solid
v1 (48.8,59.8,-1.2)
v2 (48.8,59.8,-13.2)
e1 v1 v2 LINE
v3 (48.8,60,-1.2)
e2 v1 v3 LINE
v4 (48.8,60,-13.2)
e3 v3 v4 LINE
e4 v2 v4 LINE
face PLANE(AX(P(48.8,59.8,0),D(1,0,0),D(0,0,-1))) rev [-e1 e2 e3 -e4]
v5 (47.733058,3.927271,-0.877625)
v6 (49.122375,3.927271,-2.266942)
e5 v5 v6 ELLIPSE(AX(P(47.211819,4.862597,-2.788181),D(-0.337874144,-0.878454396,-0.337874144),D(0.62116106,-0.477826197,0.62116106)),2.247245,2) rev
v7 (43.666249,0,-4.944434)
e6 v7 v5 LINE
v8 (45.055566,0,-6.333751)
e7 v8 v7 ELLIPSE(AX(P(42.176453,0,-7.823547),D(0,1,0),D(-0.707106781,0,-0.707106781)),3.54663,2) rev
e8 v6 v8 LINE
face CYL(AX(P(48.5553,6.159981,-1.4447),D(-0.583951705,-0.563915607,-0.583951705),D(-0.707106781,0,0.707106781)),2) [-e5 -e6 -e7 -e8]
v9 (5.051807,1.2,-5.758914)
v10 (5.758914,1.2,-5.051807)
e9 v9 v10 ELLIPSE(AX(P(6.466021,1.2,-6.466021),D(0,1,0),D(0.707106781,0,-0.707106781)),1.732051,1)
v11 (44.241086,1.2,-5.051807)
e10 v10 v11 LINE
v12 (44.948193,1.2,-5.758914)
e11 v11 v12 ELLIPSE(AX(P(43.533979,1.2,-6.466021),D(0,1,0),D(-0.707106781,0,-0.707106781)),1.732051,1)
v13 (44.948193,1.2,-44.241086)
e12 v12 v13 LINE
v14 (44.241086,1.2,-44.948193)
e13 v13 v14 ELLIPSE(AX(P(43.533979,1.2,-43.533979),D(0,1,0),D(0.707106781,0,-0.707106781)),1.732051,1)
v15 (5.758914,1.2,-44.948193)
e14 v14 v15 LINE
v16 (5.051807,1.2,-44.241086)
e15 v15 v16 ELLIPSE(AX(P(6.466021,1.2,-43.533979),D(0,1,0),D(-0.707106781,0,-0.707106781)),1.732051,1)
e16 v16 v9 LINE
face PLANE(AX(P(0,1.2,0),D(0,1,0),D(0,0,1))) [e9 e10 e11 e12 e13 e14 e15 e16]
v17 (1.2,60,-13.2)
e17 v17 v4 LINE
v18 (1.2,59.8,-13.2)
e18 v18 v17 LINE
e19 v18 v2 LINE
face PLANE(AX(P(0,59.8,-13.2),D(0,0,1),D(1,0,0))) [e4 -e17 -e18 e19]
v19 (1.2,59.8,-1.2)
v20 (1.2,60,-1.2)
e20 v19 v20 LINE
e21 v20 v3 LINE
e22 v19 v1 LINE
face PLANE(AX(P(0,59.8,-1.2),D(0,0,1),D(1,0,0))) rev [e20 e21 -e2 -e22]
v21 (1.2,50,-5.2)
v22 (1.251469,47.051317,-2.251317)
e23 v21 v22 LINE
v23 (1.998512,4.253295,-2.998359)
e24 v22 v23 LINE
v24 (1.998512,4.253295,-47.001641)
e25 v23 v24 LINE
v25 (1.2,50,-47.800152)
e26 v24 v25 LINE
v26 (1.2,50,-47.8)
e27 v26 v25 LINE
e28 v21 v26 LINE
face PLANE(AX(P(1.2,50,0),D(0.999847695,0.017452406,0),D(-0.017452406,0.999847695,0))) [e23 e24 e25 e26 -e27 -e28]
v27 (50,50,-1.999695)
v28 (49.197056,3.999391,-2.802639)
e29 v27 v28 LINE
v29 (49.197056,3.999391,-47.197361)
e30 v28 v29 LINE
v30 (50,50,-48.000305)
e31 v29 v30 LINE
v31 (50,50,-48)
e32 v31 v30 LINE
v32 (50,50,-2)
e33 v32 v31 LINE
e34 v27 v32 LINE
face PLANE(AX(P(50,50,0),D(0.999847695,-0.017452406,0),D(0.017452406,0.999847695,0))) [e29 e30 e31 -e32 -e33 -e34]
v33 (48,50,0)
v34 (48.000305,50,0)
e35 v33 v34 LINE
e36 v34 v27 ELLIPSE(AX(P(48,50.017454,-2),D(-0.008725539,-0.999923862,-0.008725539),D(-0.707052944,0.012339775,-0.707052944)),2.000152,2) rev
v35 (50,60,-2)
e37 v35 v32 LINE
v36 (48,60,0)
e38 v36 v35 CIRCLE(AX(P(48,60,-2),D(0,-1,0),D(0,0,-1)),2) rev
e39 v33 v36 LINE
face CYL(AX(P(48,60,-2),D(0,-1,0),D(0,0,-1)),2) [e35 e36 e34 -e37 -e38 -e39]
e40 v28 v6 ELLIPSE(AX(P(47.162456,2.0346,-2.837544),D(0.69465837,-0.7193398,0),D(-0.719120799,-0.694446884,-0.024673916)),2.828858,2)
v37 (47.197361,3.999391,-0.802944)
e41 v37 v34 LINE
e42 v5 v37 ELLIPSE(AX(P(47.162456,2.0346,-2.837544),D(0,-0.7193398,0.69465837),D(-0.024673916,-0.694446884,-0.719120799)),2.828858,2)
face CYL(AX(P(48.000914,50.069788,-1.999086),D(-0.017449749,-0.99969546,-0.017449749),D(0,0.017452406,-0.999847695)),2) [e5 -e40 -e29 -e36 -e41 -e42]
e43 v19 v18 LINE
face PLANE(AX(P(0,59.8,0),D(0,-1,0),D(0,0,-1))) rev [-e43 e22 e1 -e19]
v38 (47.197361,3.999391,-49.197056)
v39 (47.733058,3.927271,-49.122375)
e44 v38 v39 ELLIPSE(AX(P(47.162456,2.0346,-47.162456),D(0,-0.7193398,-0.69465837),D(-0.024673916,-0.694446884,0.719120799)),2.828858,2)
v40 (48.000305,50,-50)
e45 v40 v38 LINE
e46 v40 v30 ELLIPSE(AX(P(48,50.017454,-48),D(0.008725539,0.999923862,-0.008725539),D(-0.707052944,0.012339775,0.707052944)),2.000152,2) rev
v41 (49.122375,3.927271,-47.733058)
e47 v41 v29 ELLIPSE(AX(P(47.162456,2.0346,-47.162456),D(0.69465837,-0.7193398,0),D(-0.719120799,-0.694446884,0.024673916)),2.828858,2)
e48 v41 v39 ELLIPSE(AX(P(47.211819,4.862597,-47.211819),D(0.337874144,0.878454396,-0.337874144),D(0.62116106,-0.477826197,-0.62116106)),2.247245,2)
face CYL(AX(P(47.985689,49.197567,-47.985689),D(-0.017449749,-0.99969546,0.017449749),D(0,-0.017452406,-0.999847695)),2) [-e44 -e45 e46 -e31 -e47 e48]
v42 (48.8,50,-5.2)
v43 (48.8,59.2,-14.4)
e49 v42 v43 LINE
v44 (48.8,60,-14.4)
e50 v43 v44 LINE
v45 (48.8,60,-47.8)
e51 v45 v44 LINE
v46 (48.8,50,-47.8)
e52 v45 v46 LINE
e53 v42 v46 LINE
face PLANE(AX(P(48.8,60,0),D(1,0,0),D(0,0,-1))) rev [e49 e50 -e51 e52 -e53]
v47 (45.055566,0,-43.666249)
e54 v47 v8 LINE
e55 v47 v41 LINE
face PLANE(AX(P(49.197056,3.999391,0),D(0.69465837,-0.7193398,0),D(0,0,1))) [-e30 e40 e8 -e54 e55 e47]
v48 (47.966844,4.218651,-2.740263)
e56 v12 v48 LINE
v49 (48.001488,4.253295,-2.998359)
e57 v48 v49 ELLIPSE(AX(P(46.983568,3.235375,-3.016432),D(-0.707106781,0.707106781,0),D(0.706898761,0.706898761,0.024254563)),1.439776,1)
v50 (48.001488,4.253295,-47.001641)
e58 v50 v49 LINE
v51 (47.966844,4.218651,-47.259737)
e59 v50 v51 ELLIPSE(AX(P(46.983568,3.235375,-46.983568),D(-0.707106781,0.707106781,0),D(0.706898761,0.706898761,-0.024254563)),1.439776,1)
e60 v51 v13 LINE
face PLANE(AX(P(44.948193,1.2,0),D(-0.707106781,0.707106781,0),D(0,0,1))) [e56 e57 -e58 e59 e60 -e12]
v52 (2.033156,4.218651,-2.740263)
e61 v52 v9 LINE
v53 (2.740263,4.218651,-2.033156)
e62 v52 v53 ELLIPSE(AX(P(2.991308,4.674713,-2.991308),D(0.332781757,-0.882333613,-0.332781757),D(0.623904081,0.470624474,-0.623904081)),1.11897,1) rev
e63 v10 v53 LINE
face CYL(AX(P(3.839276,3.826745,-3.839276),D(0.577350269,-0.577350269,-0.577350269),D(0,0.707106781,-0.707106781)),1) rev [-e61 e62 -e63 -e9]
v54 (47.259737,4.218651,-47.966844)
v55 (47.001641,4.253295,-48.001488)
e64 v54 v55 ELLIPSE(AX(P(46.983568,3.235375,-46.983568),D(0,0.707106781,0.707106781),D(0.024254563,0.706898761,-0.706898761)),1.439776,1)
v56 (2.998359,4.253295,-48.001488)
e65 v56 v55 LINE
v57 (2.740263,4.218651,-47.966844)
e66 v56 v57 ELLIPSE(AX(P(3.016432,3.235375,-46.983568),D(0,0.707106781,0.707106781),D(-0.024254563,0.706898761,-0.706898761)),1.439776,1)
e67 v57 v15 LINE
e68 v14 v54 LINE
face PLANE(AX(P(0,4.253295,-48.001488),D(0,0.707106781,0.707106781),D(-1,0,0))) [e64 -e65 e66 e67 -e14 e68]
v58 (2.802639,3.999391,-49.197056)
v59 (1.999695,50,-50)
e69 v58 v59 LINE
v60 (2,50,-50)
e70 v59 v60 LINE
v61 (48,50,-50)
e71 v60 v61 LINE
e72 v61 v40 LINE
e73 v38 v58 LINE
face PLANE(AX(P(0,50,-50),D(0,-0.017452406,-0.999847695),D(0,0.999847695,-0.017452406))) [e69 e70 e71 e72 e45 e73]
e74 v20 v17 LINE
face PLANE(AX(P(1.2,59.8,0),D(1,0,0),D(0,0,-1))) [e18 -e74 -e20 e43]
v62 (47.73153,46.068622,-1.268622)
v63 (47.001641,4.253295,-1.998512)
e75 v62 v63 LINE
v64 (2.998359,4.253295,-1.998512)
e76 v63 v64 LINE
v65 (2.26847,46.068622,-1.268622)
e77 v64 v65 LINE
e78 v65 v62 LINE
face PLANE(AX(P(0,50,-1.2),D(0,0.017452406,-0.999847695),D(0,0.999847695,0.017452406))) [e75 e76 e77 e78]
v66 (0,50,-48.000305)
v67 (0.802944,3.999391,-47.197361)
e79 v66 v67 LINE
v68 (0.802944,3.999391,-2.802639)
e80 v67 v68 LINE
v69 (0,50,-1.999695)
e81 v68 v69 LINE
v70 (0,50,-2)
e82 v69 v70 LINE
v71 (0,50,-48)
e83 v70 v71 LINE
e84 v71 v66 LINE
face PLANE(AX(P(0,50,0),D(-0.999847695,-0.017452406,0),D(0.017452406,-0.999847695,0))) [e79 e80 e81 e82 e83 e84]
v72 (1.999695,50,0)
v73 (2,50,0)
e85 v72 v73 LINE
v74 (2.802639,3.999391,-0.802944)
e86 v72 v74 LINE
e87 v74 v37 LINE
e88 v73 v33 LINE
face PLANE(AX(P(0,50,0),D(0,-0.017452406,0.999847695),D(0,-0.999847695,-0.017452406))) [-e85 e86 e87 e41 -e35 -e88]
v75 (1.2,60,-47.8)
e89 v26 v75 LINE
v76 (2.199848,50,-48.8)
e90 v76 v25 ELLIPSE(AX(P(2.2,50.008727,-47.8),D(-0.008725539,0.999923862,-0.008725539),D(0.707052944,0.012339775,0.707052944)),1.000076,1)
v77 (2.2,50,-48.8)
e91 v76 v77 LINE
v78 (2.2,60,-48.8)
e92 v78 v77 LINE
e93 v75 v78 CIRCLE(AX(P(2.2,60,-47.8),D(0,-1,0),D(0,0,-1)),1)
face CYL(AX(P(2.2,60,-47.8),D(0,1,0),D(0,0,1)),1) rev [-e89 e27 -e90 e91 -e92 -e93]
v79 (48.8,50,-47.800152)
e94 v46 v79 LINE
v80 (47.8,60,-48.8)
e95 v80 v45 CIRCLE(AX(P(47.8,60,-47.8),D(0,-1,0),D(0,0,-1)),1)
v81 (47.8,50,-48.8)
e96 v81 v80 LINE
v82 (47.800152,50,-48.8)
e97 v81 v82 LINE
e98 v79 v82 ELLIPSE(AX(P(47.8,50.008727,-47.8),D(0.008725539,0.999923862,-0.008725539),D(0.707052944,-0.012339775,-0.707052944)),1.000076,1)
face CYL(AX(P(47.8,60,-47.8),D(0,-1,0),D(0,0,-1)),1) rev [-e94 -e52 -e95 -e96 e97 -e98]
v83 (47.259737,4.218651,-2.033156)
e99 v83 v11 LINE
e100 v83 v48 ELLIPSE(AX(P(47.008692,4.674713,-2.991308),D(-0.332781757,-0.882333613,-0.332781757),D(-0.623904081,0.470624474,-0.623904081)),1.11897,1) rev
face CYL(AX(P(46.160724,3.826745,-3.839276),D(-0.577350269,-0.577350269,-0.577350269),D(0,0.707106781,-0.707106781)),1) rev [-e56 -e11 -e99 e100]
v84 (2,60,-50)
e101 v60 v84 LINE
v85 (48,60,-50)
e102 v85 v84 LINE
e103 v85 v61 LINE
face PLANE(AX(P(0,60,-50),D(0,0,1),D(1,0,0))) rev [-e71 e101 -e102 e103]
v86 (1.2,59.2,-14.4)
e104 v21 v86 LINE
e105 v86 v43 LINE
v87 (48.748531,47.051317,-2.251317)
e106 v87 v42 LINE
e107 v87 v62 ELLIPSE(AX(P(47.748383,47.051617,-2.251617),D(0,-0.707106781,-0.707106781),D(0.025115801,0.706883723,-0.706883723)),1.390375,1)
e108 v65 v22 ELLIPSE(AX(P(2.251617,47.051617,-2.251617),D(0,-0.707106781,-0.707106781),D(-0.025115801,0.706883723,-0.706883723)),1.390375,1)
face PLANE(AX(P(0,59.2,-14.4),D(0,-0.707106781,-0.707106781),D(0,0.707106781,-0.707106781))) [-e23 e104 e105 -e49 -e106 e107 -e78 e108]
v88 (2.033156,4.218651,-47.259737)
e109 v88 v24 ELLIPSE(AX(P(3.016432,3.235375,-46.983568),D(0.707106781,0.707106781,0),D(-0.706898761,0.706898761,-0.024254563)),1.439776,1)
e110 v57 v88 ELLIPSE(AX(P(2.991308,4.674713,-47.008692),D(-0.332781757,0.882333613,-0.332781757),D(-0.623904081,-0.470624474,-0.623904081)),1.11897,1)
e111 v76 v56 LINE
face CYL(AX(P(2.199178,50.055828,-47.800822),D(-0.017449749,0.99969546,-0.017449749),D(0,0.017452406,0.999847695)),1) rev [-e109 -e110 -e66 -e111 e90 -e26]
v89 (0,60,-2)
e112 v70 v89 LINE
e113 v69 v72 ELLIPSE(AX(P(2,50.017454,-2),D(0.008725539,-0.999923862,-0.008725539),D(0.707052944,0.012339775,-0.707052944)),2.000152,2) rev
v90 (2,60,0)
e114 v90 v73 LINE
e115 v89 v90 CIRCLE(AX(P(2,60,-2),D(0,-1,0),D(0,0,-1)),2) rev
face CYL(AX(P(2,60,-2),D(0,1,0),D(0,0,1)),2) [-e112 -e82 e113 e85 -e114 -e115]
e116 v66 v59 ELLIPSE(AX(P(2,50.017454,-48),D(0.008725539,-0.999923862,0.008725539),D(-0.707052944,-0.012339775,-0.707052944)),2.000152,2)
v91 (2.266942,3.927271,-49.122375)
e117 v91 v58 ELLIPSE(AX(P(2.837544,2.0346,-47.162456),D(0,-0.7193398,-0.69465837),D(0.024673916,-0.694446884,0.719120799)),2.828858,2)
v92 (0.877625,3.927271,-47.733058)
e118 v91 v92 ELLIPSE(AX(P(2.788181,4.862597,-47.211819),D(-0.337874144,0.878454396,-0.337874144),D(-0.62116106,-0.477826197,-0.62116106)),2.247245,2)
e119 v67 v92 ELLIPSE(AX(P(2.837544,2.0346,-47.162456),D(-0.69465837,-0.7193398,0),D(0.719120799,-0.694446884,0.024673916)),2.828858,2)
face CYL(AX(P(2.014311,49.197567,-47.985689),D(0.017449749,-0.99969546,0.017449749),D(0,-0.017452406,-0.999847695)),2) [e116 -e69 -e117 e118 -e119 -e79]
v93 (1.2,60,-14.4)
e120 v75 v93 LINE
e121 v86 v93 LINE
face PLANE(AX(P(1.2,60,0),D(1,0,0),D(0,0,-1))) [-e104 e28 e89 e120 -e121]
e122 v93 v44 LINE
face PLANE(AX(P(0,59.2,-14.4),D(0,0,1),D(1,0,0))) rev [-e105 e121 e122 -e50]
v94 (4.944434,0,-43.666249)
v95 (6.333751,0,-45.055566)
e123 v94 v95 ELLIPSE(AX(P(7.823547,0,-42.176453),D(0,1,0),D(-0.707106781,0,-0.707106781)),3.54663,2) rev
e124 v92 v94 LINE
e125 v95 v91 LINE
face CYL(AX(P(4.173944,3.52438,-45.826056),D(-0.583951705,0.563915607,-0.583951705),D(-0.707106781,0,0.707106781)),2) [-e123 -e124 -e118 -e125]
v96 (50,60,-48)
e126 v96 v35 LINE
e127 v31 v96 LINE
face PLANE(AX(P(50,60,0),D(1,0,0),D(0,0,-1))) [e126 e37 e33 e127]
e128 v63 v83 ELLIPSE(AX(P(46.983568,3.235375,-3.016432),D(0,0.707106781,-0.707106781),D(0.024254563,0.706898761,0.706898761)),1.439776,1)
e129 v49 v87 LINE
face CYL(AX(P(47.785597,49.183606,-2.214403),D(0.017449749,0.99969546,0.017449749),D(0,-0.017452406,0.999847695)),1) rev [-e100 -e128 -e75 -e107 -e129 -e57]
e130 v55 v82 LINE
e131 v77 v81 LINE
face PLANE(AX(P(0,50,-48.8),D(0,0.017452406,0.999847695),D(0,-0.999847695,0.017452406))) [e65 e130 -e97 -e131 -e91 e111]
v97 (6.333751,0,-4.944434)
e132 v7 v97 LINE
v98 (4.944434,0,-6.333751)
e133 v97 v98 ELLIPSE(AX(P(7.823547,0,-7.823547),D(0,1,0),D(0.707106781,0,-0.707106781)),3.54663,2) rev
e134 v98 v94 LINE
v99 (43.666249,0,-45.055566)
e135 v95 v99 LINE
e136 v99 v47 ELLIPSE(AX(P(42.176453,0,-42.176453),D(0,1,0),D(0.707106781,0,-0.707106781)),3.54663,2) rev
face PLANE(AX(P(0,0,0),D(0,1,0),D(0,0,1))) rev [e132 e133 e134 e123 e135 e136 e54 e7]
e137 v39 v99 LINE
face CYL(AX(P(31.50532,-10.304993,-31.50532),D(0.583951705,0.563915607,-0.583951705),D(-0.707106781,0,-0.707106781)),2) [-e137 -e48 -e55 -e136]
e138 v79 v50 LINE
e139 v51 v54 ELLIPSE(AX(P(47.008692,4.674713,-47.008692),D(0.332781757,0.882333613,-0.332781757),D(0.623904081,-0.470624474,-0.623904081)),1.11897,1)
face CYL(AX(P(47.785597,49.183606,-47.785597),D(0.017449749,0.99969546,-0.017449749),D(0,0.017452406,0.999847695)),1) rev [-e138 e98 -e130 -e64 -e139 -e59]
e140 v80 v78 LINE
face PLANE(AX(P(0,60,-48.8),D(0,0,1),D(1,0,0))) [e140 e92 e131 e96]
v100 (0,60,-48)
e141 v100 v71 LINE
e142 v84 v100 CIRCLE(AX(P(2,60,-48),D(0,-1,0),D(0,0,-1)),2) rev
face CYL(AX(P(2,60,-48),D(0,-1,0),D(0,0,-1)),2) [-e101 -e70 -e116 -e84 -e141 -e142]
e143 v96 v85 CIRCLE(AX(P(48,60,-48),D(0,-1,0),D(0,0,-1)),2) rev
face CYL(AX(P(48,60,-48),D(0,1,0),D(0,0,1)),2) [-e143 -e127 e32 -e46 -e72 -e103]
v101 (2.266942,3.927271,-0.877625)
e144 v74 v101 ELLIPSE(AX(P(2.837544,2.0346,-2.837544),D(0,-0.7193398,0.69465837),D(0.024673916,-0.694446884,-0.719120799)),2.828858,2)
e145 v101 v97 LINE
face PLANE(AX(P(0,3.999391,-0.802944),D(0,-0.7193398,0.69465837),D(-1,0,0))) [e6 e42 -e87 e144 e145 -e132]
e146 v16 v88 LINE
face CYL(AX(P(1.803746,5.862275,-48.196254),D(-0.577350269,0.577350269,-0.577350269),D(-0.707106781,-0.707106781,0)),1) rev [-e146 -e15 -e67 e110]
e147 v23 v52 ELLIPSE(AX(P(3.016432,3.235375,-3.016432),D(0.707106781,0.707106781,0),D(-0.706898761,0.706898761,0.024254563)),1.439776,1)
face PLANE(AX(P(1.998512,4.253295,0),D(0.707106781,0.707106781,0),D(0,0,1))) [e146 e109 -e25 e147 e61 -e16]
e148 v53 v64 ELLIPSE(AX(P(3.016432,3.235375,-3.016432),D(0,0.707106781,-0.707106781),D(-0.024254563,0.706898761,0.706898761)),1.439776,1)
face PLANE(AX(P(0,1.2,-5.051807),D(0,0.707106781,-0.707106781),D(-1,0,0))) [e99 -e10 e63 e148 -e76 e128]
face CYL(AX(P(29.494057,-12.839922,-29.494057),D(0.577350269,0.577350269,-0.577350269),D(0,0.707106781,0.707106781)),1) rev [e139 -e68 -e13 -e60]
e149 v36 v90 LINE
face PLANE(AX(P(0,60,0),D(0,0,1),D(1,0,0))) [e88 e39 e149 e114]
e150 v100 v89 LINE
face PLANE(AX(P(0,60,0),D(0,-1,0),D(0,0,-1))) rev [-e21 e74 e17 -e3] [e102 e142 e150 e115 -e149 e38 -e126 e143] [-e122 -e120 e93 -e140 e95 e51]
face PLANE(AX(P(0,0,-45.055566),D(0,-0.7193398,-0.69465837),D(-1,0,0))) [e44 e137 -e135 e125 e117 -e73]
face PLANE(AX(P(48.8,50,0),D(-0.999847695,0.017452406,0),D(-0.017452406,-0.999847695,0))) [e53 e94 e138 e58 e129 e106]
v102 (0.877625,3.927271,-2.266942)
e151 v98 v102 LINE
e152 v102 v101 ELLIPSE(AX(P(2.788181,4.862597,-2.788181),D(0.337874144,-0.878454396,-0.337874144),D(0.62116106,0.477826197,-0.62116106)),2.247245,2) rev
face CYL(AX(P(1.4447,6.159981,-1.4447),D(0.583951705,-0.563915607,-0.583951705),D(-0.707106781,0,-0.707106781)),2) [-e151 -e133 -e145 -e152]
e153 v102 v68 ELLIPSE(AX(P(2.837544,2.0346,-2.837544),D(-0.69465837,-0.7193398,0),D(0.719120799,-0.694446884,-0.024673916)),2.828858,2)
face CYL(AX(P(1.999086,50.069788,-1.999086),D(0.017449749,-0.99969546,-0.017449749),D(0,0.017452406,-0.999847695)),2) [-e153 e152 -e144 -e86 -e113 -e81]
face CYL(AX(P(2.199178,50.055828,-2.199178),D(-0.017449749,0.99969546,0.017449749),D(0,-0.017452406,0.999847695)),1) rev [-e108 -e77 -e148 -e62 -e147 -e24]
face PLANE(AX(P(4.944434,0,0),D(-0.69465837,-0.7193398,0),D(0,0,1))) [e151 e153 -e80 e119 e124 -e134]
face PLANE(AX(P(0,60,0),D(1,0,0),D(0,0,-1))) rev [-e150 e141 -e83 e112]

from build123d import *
from OCP.BRepFilletAPI import BRepFilletAPI_MakeChamfer

# Parameters (mm, degrees)
SKETCH1_W             = 50
SKETCH1_H             = 50
SKETCH1_W_2           = 47.6
SKETCH1_H_2           = 47.6
BOSS_EXTRUDE1_DEPTH   = 50
SKETCH1_3_W           = 42
SKETCH1_3_H           = 9.2
SKETCH1_3_H_2         = 1.2
SKETCH1_3_H_3         = 31.6
SKETCH1_3_W_2         = 2.8
BOSS_EXTRUDE2_DEPTH   = 1.2
DRAFT1_ANGLE          = -1
DRAFT2_ANGLE          = 1
BOSS_EXTRUDE3_START   = 50
SKETCH1_4_W           = 50
SKETCH1_4_H           = 50
SKETCH1_4_W_2         = 47.6
SKETCH1_4_H_2         = 47.6
BOSS_EXTRUDE3_DEPTH   = 10
BOSS_EXTRUDE4_START   = 60
SKETCH1_5_W           = 42
SKETCH1_5_H           = 9.2
SKETCH1_5_H_2         = 1.2
SKETCH1_5_W_2         = 2.8
BOSS_EXTRUDE4_DEPTH   = 0.8
DRAFT3_START          = 1.2
DRAFT3_DEPTH          = 47.6
CHAMFER2_SIZE         = 3
CHAMFER2_SIZE2        = 3.053760573
CHAMFER2_EDGE_2_SIZE  = 3
CHAMFER2_EDGE_2_SIZE2 = 3.053760573
CHAMFER2_EDGE_3_SIZE  = 3
CHAMFER2_EDGE_3_SIZE2 = 3.053760573
CHAMFER2_EDGE_4_SIZE  = 3
CHAMFER2_EDGE_4_SIZE2 = 3.053760573
CHAMFER4_SIZE         = 4
CHAMFER4_SIZE2        = 4.071680764
FILLET1_R             = 2
FILLET2_R             = 1
CUT_EXTRUDE3_START    = 60
SKETCH1_10_W          = 42
SKETCH1_10_H          = 9.2
CUT_EXTRUDE3_DEPTH    = 0.2


with BuildPart() as part:
    # Sketch1 → Boss-Extrude1 (new body)
    with BuildSketch(Plane(origin=(0, 0, 0), x_dir=(1, 0, 0), z_dir=(0, 1, 0))):
        with Locations((25, 25)):
            Rectangle(SKETCH1_W, SKETCH1_H)
        with Locations((25, 25)):
            Rectangle(SKETCH1_W_2, SKETCH1_H_2, mode=Mode.SUBTRACT)
    extrude(amount=BOSS_EXTRUDE1_DEPTH)

    # Sketch1<3> → Boss-Extrude2 (add)
    with BuildSketch(Plane(origin=(0, 0, 0), x_dir=(1, 0, 0), z_dir=(0, 1, 0))):
        with Locations((25, 8.6)):
            Rectangle(SKETCH1_3_W, SKETCH1_3_H)
        with Locations((25, 13.8)):
            Rectangle(SKETCH1_3_W, SKETCH1_3_H_2)
        with Locations((25, 30.2)):
            Rectangle(SKETCH1_3_W, SKETCH1_3_H_3)
        Polygon((4, 14.4), (4, 46), (46, 46), (46, 14.4), (48.8, 14.4), (48.8, 48.8), (1.2, 48.8), (1.2, 14.4), align=None)
        Polygon((4, 4), (4, 13.2), (1.2, 13.2), (1.2, 1.2), (48.8, 1.2), (48.8, 13.2), (46, 13.2), (46, 4), align=None)
        with Locations((2.6, 13.8)):
            Rectangle(SKETCH1_3_W_2, SKETCH1_3_H_2)
        with Locations((47.4, 13.8)):
            Rectangle(SKETCH1_3_W_2, SKETCH1_3_H_2)
    extrude(amount=BOSS_EXTRUDE2_DEPTH)

    # Draft1
    draft1_faces = [part.faces().sort_by_distance(p)[0] for p in [
        (0, 25, -25),
        (25, 25, -50),
        (50, 25, -25),
        (25, 25, 0),
    ]]
    draft(draft1_faces, Plane.ZX.offset(50), DRAFT1_ANGLE)

    # Draft2
    draft2_faces = [part.faces().sort_by_distance(p)[0] for p in [
        (25, 25.6, -48.8),
        (1.2, 25.6, -25),
        (48.8, 25.6, -25),
        (25, 25.6, -1.2),
    ]]
    draft(draft2_faces, Plane.ZX.offset(50), DRAFT2_ANGLE)

    # Sketch1<4> → Boss-Extrude3 (add)
    with BuildSketch(Plane(origin=(0, 0, 0), x_dir=(1, 0, 0), z_dir=(0, 1, 0)).offset(BOSS_EXTRUDE3_START)):
        with Locations((25, 25)):
            Rectangle(SKETCH1_4_W, SKETCH1_4_H)
        with Locations((25, 25)):
            Rectangle(SKETCH1_4_W_2, SKETCH1_4_H_2, mode=Mode.SUBTRACT)
    extrude(amount=BOSS_EXTRUDE3_DEPTH)

    # Sketch1<5> → Boss-Extrude4 (add)
    with BuildSketch(Plane(origin=(0, 0, 0), x_dir=(1, 0, 0), z_dir=(0, 1, 0)).offset(BOSS_EXTRUDE4_START)):
        with Locations((25, 8.6)):
            Rectangle(SKETCH1_5_W, SKETCH1_5_H)
        with Locations((25, 13.8)):
            Rectangle(SKETCH1_5_W, SKETCH1_5_H_2)
        Polygon((4, 4), (4, 13.2), (1.2, 13.2), (1.2, 1.2), (48.8, 1.2), (48.8, 13.2), (46, 13.2), (46, 4), align=None)
        with Locations((47.4, 13.8)):
            Rectangle(SKETCH1_5_W_2, SKETCH1_5_H_2)
        with Locations((2.6, 13.8)):
            Rectangle(SKETCH1_5_W_2, SKETCH1_5_H_2)
    extrude(amount=-BOSS_EXTRUDE4_DEPTH)

    # Draft3: read off the stored shape, not the designer's step
    # Draft3 outline → Draft3 (add)
    with BuildSketch(Plane.YZ.offset(DRAFT3_START)):
        Polygon((50, -1.2), (46.06862245, -1.26862245), (59.2, -14.4), (59.2, -1.2), align=None)
    extrude(amount=DRAFT3_DEPTH)

    # Chamfer2
    chamfer2_edges = [part.edges().sort_by_distance(p)[0] for p in [
        (25, 1.2, -47.948192832),
    ]]
    chamfer2_side = [part.faces().sort_by_distance(p)[0] for p in [
        (25, 1.2, -25),
    ]]
    chamfer(chamfer2_edges, length=CHAMFER2_SIZE, length2=CHAMFER2_SIZE2, reference=chamfer2_side[0])

    # Chamfer2 edge 2
    chamfer2_edge_2_edges = [part.edges().sort_by_distance(p)[0] for p in [
        (2.051807168, 1.2, -25),
    ]]
    chamfer2_edge_2_side = [part.faces().sort_by_distance(p)[0] for p in [
        (25, 1.2, -25),
    ]]
    chamfer(chamfer2_edge_2_edges, length=CHAMFER2_EDGE_2_SIZE, length2=CHAMFER2_EDGE_2_SIZE2, reference=chamfer2_edge_2_side[0])

    # Chamfer2 edge 3
    chamfer2_edge_3_edges = [part.edges().sort_by_distance(p)[0] for p in [
        (25, 1.2, -2.051807168),
    ]]
    chamfer2_edge_3_side = [part.faces().sort_by_distance(p)[0] for p in [
        (25, 1.2, -25),
    ]]
    chamfer(chamfer2_edge_3_edges, length=CHAMFER2_EDGE_3_SIZE, length2=CHAMFER2_EDGE_3_SIZE2, reference=chamfer2_edge_3_side[0])

    # Chamfer2 edge 4
    chamfer2_edge_4_edges = [part.edges().sort_by_distance(p)[0] for p in [
        (47.948192832, 1.2, -25),
    ]]
    chamfer2_edge_4_side = [part.faces().sort_by_distance(p)[0] for p in [
        (25, 1.2, -25),
    ]]
    chamfer(chamfer2_edge_4_edges, length=CHAMFER2_EDGE_4_SIZE, length2=CHAMFER2_EDGE_4_SIZE2, reference=chamfer2_edge_4_side[0])

    # Chamfer4: one chamfer whose edges measure the first distance from different faces: ONE call of the kernel's chamfer builder (chamfer() names one face for all edges)
    chamfer4_edges_1 = [part.edges().sort_by_distance(p)[0] for p in [
        (0.872753246, 0, -25),
    ]]
    chamfer4_side_1 = [part.faces().sort_by_distance(p)[0] for p in [
        (0.433792523, 25.148042974, -25),
    ]]
    chamfer4_edges_2 = [part.edges().sort_by_distance(p)[0] for p in [
        (25, 0, -49.127246754),
    ]]
    chamfer4_side_2 = [part.faces().sort_by_distance(p)[0] for p in [
        (25, 25.148042974, -49.566207477),
    ]]
    chamfer4_edges_3 = [part.edges().sort_by_distance(p)[0] for p in [
        (49.127246754, 0, -25),
    ]]
    chamfer4_side_3 = [part.faces().sort_by_distance(p)[0] for p in [
        (49.566207477, 25.148042974, -25),
    ]]
    chamfer4_edges_4 = [part.edges().sort_by_distance(p)[0] for p in [
        (25, 0, -0.872753246),
    ]]
    chamfer4_side_4 = [part.faces().sort_by_distance(p)[0] for p in [
        (25, 25.148042974, -0.433792523),
    ]]
    chamfer4 = BRepFilletAPI_MakeChamfer(part.part.solid().wrapped)
    for e in chamfer4_edges_1:
        chamfer4.Add(CHAMFER4_SIZE, CHAMFER4_SIZE2, e.wrapped, chamfer4_side_1[0].wrapped)  # the first distance lies on this face
    for e in chamfer4_edges_2:
        chamfer4.Add(CHAMFER4_SIZE, CHAMFER4_SIZE2, e.wrapped, chamfer4_side_2[0].wrapped)  # the first distance lies on this face
    for e in chamfer4_edges_3:
        chamfer4.Add(CHAMFER4_SIZE, CHAMFER4_SIZE2, e.wrapped, chamfer4_side_3[0].wrapped)  # the first distance lies on this face
    for e in chamfer4_edges_4:
        chamfer4.Add(CHAMFER4_SIZE, CHAMFER4_SIZE2, e.wrapped, chamfer4_side_4[0].wrapped)  # the first distance lies on this face
    add(Compound.cast(chamfer4.Shape()), mode=Mode.REPLACE)

    # Fillet1
    # the kernel refuses this fillet: 2 mm, written as the material it takes off along each edge
    with BuildSketch(Plane(origin=(-0.843553781, 5.589394839, 0.843553781), x_dir=(0.8117883996686079, 0.40564694005466123, 0.4200597031229852), z_dir=(0.5839517053348507, -0.5639156068713114, -0.5839517053348507)), Plane(origin=(-0.843553781, 5.589394839, -50.843553781), x_dir=(-0.4200597031229874, 0.40564694005465957, 0.8117883996686076), z_dir=(0.5839517053348504, -0.5639156068713111, 0.5839517053348512))) as fillet1_piece_1:
        with BuildLine():
            CenterArc((FILLET1_R * 0.563915606871, -FILLET1_R), FILLET1_R, 90, 58.838659397)
            Line((-FILLET1_R * 0.291797988867, -FILLET1_R * 0.482550251649), (0, 0))
            Line((0, 0), (FILLET1_R * 0.563915606871, 0))
        make_face()
    extrude(amount=12.7313357, mode=Mode.SUBTRACT)
    with BuildSketch(Plane(origin=(50.843553781, 5.589394839, 0.843553781), x_dir=(-0.8117883996686076, 0.4056469400546599, 0.420059703122987), z_dir=(-0.5839517053348513, -0.5639156068713113, -0.5839517053348505)), Plane(origin=(50.843553781, 5.589394839, -50.843553781), x_dir=(0.420059703122986, 0.4056469400546607, 0.8117883996686078), z_dir=(-0.583951705334851, -0.5639156068713108, 0.583951705334851))) as fillet1_piece_2:
        with BuildLine():
            CenterArc((FILLET1_R * 0.563915606871, FILLET1_R), FILLET1_R, 211.161340603, 58.838659397)
            Line((-FILLET1_R * 0.291797988867, FILLET1_R * 0.482550251649), (0, 0))
            Line((0, 0), (FILLET1_R * 0.563915606871, 0))
        make_face()
    extrude(amount=12.7313357, mode=Mode.SUBTRACT)
    with BuildSketch(Plane(origin=(0.890165796, -0.997564282, -0.890165796), x_dir=(0.9998477415357947, 0.017447091479365802, 0.0003045401145796421), z_dir=(-0.017449749160682707, 0.9996954598818875, 0.017449749160682707)), Plane(origin=(0.890165796, -0.997564282, -49.109834204), x_dir=(-0.0003045401145796421, 0.017447091479365802, 0.9998477415357947), z_dir=(-0.017449749160682707, 0.9996954598818875, -0.017449749160682707))) as fillet1_piece_3:
        with BuildLine():
            CenterArc((FILLET1_R * 0.999695459882, FILLET1_R), FILLET1_R, 180.017451521, 89.982548479)
            Line((-FILLET1_R * 0.000304493731645, FILLET1_R * 0.99969541351), (0, 0))
            Line((0, 0), (FILLET1_R * 0.999695459882, 0))
        make_face()
    extrude(amount=56.011577117, mode=Mode.SUBTRACT)
    with BuildSketch(Plane(origin=(49.109834204, -0.997564282, -49.109834204), x_dir=(0.0003045401145816405, 0.017447091479365767, 0.9998477415357947), z_dir=(0.017449749160682707, 0.9996954598818875, -0.017449749160682707)), Plane(origin=(49.109834204, -0.997564282, -0.890165796), x_dir=(-0.9998477415357947, 0.01744709147936578, 0.00030454011458086336), z_dir=(0.017449749160682707, 0.9996954598818875, 0.017449749160682707))) as fillet1_piece_4:
        with BuildLine():
            CenterArc((FILLET1_R * 0.999695459882, -FILLET1_R), FILLET1_R, 90, 89.982548479)
            Line((-FILLET1_R * 0.000304493731644, -FILLET1_R * 0.99969541351), (0, 0))
            Line((0, 0), (FILLET1_R * 0.999695459882, 0))
        make_face()
    extrude(amount=56.011577117, mode=Mode.SUBTRACT)
    with BuildSketch(Plane(origin=(0, 45, -50), x_dir=(0, 0, 1), z_dir=(0, 1, 0)), Plane(origin=(0, 45, 0), x_dir=(1, 0, 0), z_dir=(0, 1, 0))) as fillet1_piece_5:
        with BuildLine():
            CenterArc((FILLET1_R, FILLET1_R), FILLET1_R, 180, 90)
            Line((0, FILLET1_R), (0, 0))
            Line((0, 0), (FILLET1_R, 0))
        make_face()
    extrude(amount=20, mode=Mode.SUBTRACT)
    with BuildSketch(Plane(origin=(50, 45, 0), x_dir=(-1, 0, 0), z_dir=(0, 1, 0)), Plane(origin=(50, 45, -50), x_dir=(0, 0, 1), z_dir=(0, 1, 0))) as fillet1_piece_6:
        with BuildLine():
            CenterArc((FILLET1_R, -FILLET1_R), FILLET1_R, 90, 90)
            Line((0, -FILLET1_R), (0, 0))
            Line((0, 0), (FILLET1_R, 0))
        make_face()
    extrude(amount=20, mode=Mode.SUBTRACT)

    # Fillet2
    # the kernel refuses this fillet: 1 mm, written as the material it adds along each edge
    with BuildSketch(Plane(origin=(5.885140502, 0.366666667, -5.885140502), x_dir=(-0.40824829046386174, 0.4082482904638633, -0.8164965809277265), z_dir=(-0.5773502691896252, 0.5773502691896272, 0.5773502691896252))) as fillet2_piece_1_section:
        with BuildLine():
            CenterArc((FILLET2_R * 0.57735026919, -FILLET2_R), FILLET2_R, 90, 60)
            Line((-FILLET2_R * 0.288675134595, -FILLET2_R * 0.5), (0, 0))
            Line((0, 0), (FILLET2_R * 0.57735026919, 0))
        make_face()
    fillet2_piece_1 = extrude(amount=8.175214232, mode=Mode.PRIVATE)
    fillet2_piece_1 = split(fillet2_piece_1, bisect_by=Plane(origin=(5.885140502, 0.300029787, -2.067516207), z_dir=(0, 0.017452406437283536, -0.9998476951563913)), keep=Keep.TOP, mode=Mode.PRIVATE)
    add(fillet2_piece_1)
    with BuildSketch(Plane(origin=(5.885140502, 0.366666667, -44.114859498), x_dir=(-0.4082482904638601, 0.4082482904638647, 0.8164965809277266), z_dir=(-0.5773502691896252, 0.5773502691896274, -0.577350269189625))) as fillet2_piece_2_section:
        with BuildLine():
            CenterArc((FILLET2_R * 0.57735026919, FILLET2_R), FILLET2_R, 210, 60)
            Line((-FILLET2_R * 0.288675134595, FILLET2_R * 0.5), (0, 0))
            Line((0, 0), (FILLET2_R * 0.57735026919, 0))
        make_face()
    fillet2_piece_2 = extrude(amount=8.175214232, mode=Mode.PRIVATE)
    fillet2_piece_2 = split(fillet2_piece_2, bisect_by=Plane(origin=(5.885140502, 0.300029787, -47.932483793), z_dir=(0, 0.017452406437283536, 0.9998476951563913)), keep=Keep.TOP, mode=Mode.PRIVATE)
    add(fillet2_piece_2)
    with BuildSketch(Plane(origin=(44.114859498, 0.366666667, -5.885140502), x_dir=(0.4082482904638648, 0.40824829046386013, -0.8164965809277265), z_dir=(0.577350269189625, 0.5773502691896274, 0.5773502691896252))) as fillet2_piece_3_section:
        with BuildLine():
            CenterArc((FILLET2_R * 0.57735026919, FILLET2_R), FILLET2_R, 210, 60)
            Line((-FILLET2_R * 0.288675134595, FILLET2_R * 0.5), (0, 0))
            Line((0, 0), (FILLET2_R * 0.57735026919, 0))
        make_face()
    fillet2_piece_3 = extrude(amount=8.175214232, mode=Mode.PRIVATE)
    fillet2_piece_3 = split(fillet2_piece_3, bisect_by=Plane(origin=(44.114859498, 0.300029787, -2.067516207), z_dir=(0, 0.017452406437283536, -0.9998476951563913)), keep=Keep.TOP, mode=Mode.PRIVATE)
    add(fillet2_piece_3)
    with BuildSketch(Plane(origin=(44.114859498, 0.366666667, -44.114859498), x_dir=(-0.8164965809277265, 0.4082482904638685, -0.40824829046385624), z_dir=(0.5773502691896251, 0.5773502691896274, -0.5773502691896251))) as fillet2_piece_4_section:
        with BuildLine():
            CenterArc((FILLET2_R * 0.57735026919, FILLET2_R), FILLET2_R, 210, 60)
            Line((-FILLET2_R * 0.288675134595, FILLET2_R * 0.5), (0, 0))
            Line((0, 0), (FILLET2_R * 0.57735026919, 0))
        make_face()
    fillet2_piece_4 = extrude(amount=8.175214232, mode=Mode.PRIVATE)
    fillet2_piece_4 = split(fillet2_piece_4, bisect_by=Plane(origin=(47.932483793, 0.300029787, -44.114859498), z_dir=(-0.9998476951563913, 0.017452406437283536, 0)), keep=Keep.TOP, mode=Mode.PRIVATE)
    add(fillet2_piece_4)
    with BuildSketch(Plane(origin=(47.957877215, 1.754817939, -47.957877215), x_dir=(-0.9998477415357947, 0.017447091479365767, -0.0003045401145816405), z_dir=(0.017449749160682707, 0.9996954598818875, -0.017449749160682707))) as fillet2_piece_5_section:
        with BuildLine():
            CenterArc((FILLET2_R * 0.999695459882, FILLET2_R), FILLET2_R, 180.017451521, 89.982548479)
            Line((-FILLET2_R * 0.000304493731648, FILLET2_R * 0.99969541351), (0, 0))
            Line((0, 0), (FILLET2_R * 0.999695459882, 0))
        make_face()
    fillet2_piece_5 = extrude(amount=50.75911778, mode=Mode.PRIVATE)
    fillet2_piece_5 = split(fillet2_piece_5, bisect_by=Plane(origin=(46.730443993, 2.982251161, -47.957877215), z_dir=(-0.707106781186549, 0.7071067811865461, 0)), keep=Keep.TOP, mode=Mode.PRIVATE)
    add(fillet2_piece_5)
    with BuildSketch(Plane(origin=(2.042122785, 1.754817939, -47.957877215), x_dir=(-0.00030454011457675554, 0.01744709147936585, 0.9998477415357947), z_dir=(-0.017449749160682707, 0.9996954598818875, -0.017449749160682707))) as fillet2_piece_6_section:
        with BuildLine():
            CenterArc((FILLET2_R * 0.999695459882, FILLET2_R), FILLET2_R, 180.017451521, 89.982548479)
            Line((-FILLET2_R * 0.000304493731643, FILLET2_R * 0.99969541351), (0, 0))
            Line((0, 0), (FILLET2_R * 0.999695459882, 0))
        make_face()
    fillet2_piece_6 = extrude(amount=50.75911778, mode=Mode.PRIVATE)
    fillet2_piece_6 = split(fillet2_piece_6, bisect_by=Plane(origin=(2.042122785, 2.982251161, -46.730443993), z_dir=(0, 0.7071067811865461, 0.707106781186549)), keep=Keep.TOP, mode=Mode.PRIVATE)
    add(fillet2_piece_6)
    with BuildSketch(Plane(origin=(1.2, 47.5, -48.8), x_dir=(0, 0, 1), z_dir=(0, 1, 0)), Plane(origin=(48.8, 47.5, -48.8), x_dir=(-1, 0, 0), z_dir=(0, 1, 0))) as fillet2_piece_7:
        with BuildLine():
            CenterArc((FILLET2_R, FILLET2_R), FILLET2_R, 180, 90)
            Line((0, FILLET2_R), (0, 0))
            Line((0, 0), (FILLET2_R, 0))
        make_face()
    extrude(amount=12.5)
    with BuildSketch(Plane(origin=(2.042122785, 1.754817939, -2.042122785), x_dir=(-0.0003045401145808143, 0.017447091479365778, -0.9998477415357947), z_dir=(-0.017449749160682707, 0.9996954598818875, 0.017449749160682707))) as fillet2_piece_8_section:
        with BuildLine():
            CenterArc((FILLET2_R * 0.999695459882, -FILLET2_R), FILLET2_R, 90, 89.982548479)
            Line((-FILLET2_R * 0.000304493731648, -FILLET2_R * 0.99969541351), (0, 0))
            Line((0, 0), (FILLET2_R * 0.999695459882, 0))
        make_face()
    fillet2_piece_8 = extrude(amount=46.826542603, mode=Mode.PRIVATE)
    fillet2_piece_8 = split(fillet2_piece_8, bisect_by=Plane(origin=(2.042122785, 2.982251161, -3.269556007), z_dir=(0, 0.7071067811865462, -0.7071067811865488)), keep=Keep.TOP, mode=Mode.PRIVATE)
    add(fillet2_piece_8)
    with BuildSketch(Plane(origin=(47.957877215, 1.754817939, -2.042122785), x_dir=(0.0003045401145816405, 0.017447091479365767, -0.9998477415357947), z_dir=(0.017449749160682707, 0.9996954598818875, 0.017449749160682707))) as fillet2_piece_9_section:
        with BuildLine():
            CenterArc((FILLET2_R * 0.999695459882, FILLET2_R), FILLET2_R, 180.017451521, 89.982548479)
            Line((-FILLET2_R * 0.000304493731647, FILLET2_R * 0.99969541351), (0, 0))
            Line((0, 0), (FILLET2_R * 0.999695459882, 0))
        make_face()
    fillet2_piece_9 = extrude(amount=46.826542603, mode=Mode.PRIVATE)
    fillet2_piece_9 = split(fillet2_piece_9, bisect_by=Plane(origin=(47.957877215, 2.982251161, -3.269556007), z_dir=(0, 0.7071067811865462, -0.7071067811865488)), keep=Keep.TOP, mode=Mode.PRIVATE)
    add(fillet2_piece_9)

    # Sketch1<10> → Cut-Extrude3 (cut)
    with BuildSketch(Plane(origin=(0, 0, 0), x_dir=(1, 0, 0), z_dir=(0, 1, 0)).offset(CUT_EXTRUDE3_START)):
        with Locations((25, 8.6)):
            Rectangle(SKETCH1_10_W, SKETCH1_10_H)
        Polygon((4, 4), (4, 13.2), (1.2, 13.2), (1.2, 1.2), (48.8, 1.2), (48.8, 13.2), (46, 13.2), (46, 4), align=None)
    extrude(amount=-CUT_EXTRUDE3_DEPTH, mode=Mode.SUBTRACT)


solid = part.part
